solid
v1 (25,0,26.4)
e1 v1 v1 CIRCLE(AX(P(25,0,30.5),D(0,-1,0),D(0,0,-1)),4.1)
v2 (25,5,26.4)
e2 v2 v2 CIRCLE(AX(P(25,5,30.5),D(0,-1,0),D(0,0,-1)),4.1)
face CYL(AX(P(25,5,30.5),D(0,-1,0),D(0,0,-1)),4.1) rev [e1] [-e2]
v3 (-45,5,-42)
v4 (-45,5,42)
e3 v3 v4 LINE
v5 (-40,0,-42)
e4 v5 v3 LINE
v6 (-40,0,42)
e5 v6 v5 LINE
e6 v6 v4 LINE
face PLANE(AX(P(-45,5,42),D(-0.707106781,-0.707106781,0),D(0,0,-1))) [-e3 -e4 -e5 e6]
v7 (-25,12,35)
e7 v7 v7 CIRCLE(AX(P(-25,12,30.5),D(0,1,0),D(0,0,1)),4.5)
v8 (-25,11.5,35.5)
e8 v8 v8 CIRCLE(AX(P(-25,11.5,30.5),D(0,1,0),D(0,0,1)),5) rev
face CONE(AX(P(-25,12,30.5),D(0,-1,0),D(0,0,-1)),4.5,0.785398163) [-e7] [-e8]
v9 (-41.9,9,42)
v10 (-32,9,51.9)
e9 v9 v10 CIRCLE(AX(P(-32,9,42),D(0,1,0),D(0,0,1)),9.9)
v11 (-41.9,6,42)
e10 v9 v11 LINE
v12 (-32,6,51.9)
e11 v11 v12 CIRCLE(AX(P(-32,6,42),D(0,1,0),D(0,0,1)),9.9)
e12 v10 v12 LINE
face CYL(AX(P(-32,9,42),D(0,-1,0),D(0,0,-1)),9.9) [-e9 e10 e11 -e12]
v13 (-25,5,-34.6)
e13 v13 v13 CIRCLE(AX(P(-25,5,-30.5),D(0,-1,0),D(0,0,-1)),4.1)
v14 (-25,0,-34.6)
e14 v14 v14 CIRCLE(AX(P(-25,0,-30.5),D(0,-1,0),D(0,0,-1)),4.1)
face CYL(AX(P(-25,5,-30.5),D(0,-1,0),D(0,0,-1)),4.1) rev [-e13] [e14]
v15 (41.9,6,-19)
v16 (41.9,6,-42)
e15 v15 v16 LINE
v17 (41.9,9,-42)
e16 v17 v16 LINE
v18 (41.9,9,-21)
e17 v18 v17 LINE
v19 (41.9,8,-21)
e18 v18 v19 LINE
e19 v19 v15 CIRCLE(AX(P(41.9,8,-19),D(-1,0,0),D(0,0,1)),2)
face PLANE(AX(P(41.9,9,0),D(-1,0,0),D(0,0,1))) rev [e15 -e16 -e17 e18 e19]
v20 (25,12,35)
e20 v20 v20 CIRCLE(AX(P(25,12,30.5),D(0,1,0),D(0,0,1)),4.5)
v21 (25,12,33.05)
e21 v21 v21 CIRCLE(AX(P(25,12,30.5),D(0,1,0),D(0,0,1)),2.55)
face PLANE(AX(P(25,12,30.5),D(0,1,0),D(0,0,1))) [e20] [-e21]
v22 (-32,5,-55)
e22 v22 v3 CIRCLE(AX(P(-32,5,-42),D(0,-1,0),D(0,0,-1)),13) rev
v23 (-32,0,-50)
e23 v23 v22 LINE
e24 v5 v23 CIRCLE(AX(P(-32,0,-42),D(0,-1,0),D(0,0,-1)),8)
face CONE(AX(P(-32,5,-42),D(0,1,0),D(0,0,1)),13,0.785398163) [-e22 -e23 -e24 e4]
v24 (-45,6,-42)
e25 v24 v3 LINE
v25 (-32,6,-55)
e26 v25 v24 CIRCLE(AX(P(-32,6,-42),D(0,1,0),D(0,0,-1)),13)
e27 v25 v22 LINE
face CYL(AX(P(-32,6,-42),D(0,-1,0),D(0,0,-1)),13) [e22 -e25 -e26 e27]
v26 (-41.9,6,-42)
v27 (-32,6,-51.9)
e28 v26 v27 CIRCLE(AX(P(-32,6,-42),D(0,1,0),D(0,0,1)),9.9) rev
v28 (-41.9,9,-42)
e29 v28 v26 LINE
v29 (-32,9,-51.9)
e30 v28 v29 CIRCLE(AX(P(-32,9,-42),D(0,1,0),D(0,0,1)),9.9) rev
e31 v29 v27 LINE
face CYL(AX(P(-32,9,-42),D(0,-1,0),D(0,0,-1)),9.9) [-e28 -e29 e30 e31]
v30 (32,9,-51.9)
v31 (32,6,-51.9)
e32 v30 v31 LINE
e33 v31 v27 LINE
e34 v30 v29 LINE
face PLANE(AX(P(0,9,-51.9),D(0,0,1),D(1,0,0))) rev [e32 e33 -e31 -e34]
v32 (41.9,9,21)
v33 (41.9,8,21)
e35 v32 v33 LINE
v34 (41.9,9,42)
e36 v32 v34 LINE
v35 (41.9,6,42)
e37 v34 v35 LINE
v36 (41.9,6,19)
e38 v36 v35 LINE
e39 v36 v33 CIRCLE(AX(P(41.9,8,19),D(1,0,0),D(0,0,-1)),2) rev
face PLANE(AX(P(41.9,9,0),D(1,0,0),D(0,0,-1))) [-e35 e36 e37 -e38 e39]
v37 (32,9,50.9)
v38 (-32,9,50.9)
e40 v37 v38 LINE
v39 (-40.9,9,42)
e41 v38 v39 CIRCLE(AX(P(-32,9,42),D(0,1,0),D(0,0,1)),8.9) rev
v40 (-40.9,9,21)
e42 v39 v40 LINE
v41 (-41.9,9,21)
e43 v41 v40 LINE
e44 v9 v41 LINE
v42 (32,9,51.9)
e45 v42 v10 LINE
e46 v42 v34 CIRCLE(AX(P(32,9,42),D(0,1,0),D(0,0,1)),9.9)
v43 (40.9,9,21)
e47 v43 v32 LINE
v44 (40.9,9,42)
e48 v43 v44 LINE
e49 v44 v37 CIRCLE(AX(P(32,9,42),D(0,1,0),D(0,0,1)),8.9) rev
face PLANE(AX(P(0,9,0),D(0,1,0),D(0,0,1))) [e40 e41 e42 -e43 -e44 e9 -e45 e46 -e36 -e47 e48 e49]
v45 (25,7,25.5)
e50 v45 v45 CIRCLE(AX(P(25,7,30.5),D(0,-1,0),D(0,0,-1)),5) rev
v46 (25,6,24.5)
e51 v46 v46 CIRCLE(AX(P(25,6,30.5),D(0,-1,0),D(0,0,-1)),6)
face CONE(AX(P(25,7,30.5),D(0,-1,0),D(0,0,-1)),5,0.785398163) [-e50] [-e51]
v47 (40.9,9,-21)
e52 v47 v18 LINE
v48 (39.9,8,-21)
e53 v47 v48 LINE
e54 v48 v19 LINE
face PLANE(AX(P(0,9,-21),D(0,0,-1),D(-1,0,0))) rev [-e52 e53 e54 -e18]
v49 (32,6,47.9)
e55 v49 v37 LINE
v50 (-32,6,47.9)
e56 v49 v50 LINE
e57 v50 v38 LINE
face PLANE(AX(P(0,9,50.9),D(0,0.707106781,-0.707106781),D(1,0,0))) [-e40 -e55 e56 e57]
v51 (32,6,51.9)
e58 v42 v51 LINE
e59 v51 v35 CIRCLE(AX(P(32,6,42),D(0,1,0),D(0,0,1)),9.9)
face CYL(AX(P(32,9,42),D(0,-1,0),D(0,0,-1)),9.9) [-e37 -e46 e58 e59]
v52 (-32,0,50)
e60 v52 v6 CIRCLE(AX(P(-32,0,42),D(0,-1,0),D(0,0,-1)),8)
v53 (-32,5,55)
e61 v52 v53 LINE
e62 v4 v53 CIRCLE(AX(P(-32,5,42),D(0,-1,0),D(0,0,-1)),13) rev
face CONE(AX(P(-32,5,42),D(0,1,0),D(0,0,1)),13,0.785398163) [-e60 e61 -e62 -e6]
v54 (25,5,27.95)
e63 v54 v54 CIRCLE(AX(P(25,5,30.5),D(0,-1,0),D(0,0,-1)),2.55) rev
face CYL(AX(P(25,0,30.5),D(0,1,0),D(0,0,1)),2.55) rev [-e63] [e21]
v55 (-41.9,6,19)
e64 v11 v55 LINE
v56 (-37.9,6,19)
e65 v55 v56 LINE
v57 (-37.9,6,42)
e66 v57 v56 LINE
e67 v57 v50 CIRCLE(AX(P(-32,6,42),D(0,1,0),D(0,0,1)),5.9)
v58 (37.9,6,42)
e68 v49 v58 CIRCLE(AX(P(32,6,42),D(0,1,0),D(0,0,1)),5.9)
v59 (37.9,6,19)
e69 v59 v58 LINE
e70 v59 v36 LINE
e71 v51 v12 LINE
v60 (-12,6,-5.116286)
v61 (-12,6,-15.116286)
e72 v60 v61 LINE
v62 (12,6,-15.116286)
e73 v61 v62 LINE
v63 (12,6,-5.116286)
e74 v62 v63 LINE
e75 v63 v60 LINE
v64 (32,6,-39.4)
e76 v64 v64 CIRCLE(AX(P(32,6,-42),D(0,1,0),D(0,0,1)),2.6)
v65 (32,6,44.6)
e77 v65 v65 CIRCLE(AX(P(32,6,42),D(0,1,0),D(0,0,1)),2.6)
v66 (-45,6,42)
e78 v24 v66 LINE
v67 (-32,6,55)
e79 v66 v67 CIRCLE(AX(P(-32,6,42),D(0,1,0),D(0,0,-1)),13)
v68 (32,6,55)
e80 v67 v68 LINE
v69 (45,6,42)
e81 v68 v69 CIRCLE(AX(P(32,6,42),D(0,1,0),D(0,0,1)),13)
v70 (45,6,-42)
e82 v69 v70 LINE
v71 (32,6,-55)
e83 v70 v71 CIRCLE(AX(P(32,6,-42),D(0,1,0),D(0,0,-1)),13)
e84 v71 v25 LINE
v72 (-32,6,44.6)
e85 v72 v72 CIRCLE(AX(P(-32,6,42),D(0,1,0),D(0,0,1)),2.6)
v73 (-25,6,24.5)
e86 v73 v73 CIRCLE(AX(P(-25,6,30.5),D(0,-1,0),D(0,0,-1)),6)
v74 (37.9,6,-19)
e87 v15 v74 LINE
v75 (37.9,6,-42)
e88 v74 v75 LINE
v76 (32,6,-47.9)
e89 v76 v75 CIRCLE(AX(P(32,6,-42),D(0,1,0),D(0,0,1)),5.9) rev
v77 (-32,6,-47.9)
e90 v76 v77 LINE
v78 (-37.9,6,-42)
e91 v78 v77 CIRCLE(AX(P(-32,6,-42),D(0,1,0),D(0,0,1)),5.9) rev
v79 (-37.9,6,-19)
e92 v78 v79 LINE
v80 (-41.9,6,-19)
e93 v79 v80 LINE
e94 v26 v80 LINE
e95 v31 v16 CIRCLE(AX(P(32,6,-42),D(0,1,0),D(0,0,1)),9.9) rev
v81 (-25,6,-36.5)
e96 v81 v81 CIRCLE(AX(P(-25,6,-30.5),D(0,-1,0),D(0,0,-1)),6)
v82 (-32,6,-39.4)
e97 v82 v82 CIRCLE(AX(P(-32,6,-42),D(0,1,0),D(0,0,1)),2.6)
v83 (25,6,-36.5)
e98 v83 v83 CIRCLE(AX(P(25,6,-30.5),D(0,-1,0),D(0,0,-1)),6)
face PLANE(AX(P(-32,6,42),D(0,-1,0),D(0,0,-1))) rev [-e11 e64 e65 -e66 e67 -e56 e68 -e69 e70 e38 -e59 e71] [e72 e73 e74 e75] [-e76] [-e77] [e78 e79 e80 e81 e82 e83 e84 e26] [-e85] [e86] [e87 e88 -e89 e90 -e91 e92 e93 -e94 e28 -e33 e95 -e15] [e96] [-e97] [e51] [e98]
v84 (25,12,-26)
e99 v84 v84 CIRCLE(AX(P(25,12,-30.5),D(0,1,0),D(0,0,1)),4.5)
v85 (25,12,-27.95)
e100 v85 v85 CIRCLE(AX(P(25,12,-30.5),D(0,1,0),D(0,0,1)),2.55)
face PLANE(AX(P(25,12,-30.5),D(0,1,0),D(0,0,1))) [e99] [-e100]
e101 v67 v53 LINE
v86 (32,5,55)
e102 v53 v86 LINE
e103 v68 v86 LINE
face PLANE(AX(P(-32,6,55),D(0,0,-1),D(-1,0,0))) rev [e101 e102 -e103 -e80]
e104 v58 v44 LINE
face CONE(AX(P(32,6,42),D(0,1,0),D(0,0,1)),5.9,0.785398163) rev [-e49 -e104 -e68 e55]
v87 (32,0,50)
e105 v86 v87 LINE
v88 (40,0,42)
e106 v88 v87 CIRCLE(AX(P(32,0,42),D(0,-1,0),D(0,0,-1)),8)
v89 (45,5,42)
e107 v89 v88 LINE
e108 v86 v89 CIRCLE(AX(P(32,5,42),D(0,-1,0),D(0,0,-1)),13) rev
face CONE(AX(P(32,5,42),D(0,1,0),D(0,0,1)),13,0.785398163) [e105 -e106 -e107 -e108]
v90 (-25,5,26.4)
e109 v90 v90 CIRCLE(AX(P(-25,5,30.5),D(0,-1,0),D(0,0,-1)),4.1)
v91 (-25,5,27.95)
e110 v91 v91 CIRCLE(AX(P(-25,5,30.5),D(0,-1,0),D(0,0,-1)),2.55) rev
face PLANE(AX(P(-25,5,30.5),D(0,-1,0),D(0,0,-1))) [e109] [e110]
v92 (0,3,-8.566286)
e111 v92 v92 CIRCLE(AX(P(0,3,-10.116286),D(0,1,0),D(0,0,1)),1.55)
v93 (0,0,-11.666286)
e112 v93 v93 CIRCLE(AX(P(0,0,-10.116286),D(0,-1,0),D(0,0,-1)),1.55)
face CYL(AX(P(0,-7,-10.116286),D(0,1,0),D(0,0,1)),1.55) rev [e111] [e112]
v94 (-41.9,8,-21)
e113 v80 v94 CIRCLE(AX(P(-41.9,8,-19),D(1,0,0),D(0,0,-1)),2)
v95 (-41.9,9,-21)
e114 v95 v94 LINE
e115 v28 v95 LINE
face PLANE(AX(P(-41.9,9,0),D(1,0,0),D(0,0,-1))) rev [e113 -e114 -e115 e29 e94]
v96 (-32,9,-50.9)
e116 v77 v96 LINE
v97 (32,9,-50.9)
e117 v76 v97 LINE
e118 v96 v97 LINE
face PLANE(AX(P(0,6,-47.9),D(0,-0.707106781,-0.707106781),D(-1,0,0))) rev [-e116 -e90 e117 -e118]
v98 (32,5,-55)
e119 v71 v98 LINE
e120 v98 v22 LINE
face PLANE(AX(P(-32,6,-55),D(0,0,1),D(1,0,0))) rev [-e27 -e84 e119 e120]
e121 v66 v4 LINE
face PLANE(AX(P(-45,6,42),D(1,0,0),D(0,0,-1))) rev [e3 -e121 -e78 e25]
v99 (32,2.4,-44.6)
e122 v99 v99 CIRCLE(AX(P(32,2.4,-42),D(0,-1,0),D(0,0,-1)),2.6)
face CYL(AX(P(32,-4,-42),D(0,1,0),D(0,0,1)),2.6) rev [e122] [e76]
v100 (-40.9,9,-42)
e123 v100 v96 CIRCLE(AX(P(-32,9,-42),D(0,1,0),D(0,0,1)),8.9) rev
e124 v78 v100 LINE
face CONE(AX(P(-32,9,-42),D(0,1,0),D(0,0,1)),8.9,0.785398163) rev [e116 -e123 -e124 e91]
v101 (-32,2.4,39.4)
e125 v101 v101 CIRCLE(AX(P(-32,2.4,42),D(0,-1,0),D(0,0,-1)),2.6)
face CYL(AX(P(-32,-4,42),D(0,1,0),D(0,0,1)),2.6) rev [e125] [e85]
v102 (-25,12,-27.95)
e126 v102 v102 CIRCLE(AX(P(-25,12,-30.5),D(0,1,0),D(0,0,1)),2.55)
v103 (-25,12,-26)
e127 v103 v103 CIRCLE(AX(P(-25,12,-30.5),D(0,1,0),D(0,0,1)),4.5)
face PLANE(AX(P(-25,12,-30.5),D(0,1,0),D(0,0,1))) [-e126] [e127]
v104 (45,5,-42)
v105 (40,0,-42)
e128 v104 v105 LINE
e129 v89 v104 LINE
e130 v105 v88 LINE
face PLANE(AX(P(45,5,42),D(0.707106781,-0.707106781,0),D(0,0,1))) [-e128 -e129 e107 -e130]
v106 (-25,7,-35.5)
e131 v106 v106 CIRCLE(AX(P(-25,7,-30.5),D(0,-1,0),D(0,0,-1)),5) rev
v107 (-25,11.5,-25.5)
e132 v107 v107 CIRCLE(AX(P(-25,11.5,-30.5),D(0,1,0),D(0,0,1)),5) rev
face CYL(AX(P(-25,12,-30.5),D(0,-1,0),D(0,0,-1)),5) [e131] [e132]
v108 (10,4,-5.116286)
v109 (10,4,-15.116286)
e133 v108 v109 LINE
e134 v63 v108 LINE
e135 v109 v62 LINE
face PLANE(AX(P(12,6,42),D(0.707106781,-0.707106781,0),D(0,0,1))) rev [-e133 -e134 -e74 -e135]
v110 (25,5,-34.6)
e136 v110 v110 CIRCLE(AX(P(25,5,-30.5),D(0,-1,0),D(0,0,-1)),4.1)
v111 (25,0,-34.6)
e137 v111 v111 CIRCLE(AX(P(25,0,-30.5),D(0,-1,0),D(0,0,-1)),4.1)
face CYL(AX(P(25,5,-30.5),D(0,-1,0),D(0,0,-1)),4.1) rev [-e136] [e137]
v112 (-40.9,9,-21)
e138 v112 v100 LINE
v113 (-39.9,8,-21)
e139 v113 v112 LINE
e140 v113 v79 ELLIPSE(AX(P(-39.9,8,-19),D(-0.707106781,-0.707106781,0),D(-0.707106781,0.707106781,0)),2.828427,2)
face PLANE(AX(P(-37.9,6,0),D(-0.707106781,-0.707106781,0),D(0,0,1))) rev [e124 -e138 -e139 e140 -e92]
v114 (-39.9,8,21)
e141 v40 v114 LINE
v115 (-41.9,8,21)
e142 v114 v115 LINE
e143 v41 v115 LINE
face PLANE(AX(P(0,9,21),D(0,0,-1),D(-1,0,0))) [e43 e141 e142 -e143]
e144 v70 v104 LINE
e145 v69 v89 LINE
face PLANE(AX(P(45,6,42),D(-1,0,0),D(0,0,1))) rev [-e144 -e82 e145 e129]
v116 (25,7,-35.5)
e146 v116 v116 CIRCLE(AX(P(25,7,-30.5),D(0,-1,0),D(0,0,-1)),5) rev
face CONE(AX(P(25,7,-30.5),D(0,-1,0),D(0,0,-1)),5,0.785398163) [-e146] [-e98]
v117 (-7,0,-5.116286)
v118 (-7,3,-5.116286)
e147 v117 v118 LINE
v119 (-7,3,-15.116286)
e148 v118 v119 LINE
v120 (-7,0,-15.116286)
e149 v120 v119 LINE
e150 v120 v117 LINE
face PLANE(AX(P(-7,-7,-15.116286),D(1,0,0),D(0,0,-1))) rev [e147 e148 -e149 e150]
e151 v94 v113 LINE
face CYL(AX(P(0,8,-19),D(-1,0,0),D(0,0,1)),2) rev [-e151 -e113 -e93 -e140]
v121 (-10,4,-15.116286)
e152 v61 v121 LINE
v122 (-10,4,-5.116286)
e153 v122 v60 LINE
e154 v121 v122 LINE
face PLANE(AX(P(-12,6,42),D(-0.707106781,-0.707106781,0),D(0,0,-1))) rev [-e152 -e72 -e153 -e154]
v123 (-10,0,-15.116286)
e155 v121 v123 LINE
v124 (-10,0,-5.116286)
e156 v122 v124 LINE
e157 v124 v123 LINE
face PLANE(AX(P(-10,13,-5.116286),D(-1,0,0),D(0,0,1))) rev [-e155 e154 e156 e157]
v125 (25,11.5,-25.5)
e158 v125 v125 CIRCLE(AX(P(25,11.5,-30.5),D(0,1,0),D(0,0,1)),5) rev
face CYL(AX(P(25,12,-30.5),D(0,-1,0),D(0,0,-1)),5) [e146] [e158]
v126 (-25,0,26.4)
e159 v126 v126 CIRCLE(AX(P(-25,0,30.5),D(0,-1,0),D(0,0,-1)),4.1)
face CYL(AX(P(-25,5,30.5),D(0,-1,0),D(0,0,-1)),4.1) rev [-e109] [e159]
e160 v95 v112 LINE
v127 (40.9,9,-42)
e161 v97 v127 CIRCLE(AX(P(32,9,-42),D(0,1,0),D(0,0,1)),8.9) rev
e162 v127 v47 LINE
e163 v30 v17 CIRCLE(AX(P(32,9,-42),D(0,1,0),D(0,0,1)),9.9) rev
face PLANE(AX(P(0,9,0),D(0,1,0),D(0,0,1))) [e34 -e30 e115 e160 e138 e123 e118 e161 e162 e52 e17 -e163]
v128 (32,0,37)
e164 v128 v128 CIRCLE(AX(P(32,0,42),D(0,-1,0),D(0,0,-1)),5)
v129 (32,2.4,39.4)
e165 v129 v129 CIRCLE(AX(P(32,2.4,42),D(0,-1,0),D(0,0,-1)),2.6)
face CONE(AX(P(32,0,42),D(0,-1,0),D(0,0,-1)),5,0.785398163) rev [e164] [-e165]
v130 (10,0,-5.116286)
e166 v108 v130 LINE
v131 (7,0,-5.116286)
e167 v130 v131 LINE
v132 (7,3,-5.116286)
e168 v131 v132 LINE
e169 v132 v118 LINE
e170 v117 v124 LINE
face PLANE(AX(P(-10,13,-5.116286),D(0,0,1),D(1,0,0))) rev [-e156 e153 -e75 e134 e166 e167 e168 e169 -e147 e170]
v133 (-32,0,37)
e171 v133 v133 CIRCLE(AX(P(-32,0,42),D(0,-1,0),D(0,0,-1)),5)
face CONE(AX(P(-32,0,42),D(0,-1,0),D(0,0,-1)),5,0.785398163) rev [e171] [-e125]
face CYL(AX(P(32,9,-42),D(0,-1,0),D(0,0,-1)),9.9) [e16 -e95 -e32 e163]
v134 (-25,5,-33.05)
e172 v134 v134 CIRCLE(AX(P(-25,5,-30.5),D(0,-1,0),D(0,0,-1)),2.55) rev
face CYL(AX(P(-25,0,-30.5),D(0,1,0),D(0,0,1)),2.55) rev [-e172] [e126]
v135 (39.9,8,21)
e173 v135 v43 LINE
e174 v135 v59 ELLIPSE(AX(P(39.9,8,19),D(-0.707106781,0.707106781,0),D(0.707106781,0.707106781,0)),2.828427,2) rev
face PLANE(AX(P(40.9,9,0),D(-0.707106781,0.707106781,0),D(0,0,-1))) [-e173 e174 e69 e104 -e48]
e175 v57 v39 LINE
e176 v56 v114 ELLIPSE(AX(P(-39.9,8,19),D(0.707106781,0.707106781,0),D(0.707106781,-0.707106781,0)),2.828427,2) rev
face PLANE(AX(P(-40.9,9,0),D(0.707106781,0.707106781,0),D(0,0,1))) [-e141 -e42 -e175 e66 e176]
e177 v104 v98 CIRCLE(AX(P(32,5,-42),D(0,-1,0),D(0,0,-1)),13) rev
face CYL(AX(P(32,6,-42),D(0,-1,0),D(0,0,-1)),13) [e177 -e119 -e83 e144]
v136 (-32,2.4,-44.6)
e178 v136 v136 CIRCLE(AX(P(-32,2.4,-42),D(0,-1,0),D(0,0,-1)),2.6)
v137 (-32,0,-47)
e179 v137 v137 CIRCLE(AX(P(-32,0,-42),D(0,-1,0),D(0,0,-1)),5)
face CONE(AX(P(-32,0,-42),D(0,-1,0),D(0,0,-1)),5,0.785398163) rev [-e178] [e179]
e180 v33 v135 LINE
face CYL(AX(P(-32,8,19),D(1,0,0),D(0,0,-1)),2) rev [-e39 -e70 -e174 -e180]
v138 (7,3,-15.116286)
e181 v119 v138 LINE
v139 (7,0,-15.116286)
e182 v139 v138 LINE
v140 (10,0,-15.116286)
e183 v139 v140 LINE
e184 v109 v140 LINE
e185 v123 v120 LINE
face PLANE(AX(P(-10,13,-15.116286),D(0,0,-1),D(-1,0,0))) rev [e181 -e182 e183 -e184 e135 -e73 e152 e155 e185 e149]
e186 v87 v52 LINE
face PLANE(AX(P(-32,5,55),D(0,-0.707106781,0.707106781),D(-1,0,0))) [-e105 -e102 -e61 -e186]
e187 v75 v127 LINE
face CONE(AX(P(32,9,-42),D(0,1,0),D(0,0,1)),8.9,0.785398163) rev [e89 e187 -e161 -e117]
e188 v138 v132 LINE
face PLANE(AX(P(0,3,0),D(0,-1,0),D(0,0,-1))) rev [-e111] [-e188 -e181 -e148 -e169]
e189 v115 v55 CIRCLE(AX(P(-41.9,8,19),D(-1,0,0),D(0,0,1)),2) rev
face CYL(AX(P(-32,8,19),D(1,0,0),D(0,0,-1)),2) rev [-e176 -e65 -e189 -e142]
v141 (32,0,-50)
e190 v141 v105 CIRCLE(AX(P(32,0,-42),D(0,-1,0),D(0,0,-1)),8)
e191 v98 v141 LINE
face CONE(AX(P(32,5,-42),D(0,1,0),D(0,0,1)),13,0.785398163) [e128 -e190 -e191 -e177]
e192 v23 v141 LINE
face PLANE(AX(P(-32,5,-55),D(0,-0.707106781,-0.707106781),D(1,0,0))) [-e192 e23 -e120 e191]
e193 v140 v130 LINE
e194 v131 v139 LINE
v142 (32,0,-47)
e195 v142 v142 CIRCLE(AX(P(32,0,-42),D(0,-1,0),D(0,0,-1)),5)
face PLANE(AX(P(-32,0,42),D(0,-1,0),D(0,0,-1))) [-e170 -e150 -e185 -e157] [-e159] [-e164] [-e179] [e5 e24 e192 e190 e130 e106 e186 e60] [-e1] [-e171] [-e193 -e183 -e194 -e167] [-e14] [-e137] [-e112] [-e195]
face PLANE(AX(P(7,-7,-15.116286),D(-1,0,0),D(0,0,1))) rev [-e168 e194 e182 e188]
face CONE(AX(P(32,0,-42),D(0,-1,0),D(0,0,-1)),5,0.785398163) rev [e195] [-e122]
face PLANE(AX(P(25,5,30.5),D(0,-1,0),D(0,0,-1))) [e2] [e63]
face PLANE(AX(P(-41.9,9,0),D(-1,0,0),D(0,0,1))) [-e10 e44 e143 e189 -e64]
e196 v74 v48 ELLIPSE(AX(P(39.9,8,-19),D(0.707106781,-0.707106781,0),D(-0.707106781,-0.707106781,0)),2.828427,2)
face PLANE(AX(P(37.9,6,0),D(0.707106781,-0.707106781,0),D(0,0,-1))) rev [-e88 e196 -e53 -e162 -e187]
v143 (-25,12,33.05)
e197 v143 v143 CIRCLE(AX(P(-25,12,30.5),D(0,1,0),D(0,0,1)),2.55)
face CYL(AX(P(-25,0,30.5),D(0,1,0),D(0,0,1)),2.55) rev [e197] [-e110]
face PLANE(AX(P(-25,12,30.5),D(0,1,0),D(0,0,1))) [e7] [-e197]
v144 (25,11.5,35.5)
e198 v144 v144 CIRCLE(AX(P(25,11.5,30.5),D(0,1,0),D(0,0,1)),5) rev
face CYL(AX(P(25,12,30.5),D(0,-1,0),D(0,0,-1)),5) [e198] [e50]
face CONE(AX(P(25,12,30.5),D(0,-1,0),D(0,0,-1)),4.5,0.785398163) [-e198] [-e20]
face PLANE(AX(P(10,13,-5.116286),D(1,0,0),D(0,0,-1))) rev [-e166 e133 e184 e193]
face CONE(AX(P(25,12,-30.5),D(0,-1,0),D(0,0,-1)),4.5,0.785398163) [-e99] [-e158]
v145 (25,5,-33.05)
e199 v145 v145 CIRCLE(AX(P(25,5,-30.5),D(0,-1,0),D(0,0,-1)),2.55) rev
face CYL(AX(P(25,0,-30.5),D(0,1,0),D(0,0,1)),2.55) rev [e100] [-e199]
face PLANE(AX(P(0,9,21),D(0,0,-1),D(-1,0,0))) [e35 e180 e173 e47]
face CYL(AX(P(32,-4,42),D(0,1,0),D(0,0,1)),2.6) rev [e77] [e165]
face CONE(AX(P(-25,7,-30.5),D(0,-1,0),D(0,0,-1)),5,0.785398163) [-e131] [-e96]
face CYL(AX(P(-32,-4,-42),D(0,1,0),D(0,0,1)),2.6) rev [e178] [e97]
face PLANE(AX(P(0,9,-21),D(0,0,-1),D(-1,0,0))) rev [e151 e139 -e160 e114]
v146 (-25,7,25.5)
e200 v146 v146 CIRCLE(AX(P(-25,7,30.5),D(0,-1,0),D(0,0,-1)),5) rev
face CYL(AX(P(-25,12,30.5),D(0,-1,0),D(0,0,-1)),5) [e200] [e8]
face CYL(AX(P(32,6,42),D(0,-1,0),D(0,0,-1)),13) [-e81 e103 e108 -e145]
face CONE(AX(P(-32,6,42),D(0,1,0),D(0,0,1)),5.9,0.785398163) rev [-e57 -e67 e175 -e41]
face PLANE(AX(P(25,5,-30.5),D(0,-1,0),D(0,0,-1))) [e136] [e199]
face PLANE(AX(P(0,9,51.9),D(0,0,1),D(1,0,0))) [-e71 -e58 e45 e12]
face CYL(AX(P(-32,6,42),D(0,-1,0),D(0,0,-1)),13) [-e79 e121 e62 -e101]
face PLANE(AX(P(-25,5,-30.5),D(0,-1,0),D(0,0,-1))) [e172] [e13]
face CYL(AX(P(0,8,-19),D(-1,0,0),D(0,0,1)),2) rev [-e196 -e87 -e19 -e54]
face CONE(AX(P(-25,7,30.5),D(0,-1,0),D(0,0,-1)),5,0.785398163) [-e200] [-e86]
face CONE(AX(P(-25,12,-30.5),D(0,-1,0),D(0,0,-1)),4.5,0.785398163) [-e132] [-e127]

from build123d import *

# Parameters (mm, degrees)
BOSS_EXTRUDE1_DEPTH          = 6
CHAMFER1_SIZE                = 5
BOSS_EXTRUDE2_DEPTH          = 3
CHAMFER2_SIZE                = 3
SKETCH3_R                    = 2.55
CUT_EXTRUDE1_DEPTH           = 72.316197319
BOSS_EXTRUDE3_START          = 6
SKETCH4_R                    = 5
SKETCH4_R_2                  = 2.55
BOSS_EXTRUDE3_DEPTH          = 6
CHAMFER3_SIZE                = 1
CHAMFER4_SIZE                = 0.5
SKETCH5_R                    = 4.1
CUT_EXTRUDE2_DEPTH           = 5
SKETCH6_R                    = 2.6
CUT_EXTRUDE3_DEPTH           = 10
SKETCH7_R                    = 5
CUT_EXTRUDE4_DEPTH           = 2.8
CUT_EXTRUDE4_DRAFT           = -45
CUT_EXTRUDE4_PROFILE_2_DEPTH = 2.8
CUT_EXTRUDE4_PROFILE_2_DRAFT = -45
CUT_EXTRUDE4_PROFILE_3_DEPTH = 2.8
CUT_EXTRUDE4_PROFILE_3_DRAFT = -45
CUT_EXTRUDE4_PROFILE_4_DEPTH = 2.8
CUT_EXTRUDE4_PROFILE_4_DRAFT = -45
FILLET1_R                    = 2
CUT_EXTRUDE5_START           = -3
SKETCH8_W                    = 20
SKETCH8_H                    = 10
CUT_EXTRUDE5_DEPTH           = 10
CHAMFER5_SIZE                = 2
SKETCH9_R                    = 1.55
SKETCH9_W                    = 3
SKETCH9_H                    = 10
CUT_EXTRUDE6_DEPTH           = 10


with BuildPart() as part:
    # Sketch1 → Boss-Extrude1 (new body)
    with BuildSketch(Plane(origin=(0, 0, 0), x_dir=(1, 0, 0), z_dir=(0, 1, 0))):
        with BuildLine():
            Line((-32, -55), (32, -55))
            ThreePointArc((32, -55), (41.192388155, -51.192388155), (45, -42))
            Line((45, -42), (45, 42))
            ThreePointArc((45, 42), (41.192388155, 51.192388155), (32, 55))
            Line((32, 55), (-32, 55))
            ThreePointArc((-32, 55), (-41.192388155, 51.192388155), (-45, 42))
            Line((-45, 42), (-45, -42))
            ThreePointArc((-45, -42), (-41.192388155, -51.192388155), (-32, -55))
        make_face()
    extrude(amount=BOSS_EXTRUDE1_DEPTH)

    # Chamfer1
    chamfer1_edges = [part.edges().sort_by_distance(p)[0] for p in [
        (45, 0, 0),
        (41.192388155, 0, 51.192388155),
        (0, 0, 55),
        (-41.192388155, 0, 51.192388155),
        (-45, 0, 0),
        (-41.192388155, 0, -51.192388155),
        (0, 0, -55),
        (41.192388155, 0, -51.192388155),
    ]]
    chamfer(chamfer1_edges, length=CHAMFER1_SIZE)

    # Sketch2 → Boss-Extrude2 (add)
    with BuildSketch(Plane(origin=(0, 6, 0), x_dir=(1, 0, 0), z_dir=(0, 1, 0))):
        with BuildLine():
            ThreePointArc((-37.9, -42), (-36.171930009, -46.171930009), (-32, -47.9))
            Line((-32, -47.9), (32, -47.9))
            ThreePointArc((32, -47.9), (36.171930009, -46.171930009), (37.9, -42))
            Line((37.9, -42), (37.9, -21))
            Line((37.9, -21), (41.9, -21))
            Line((41.9, -21), (41.9, -42))
            ThreePointArc((41.9, -42), (39.000357134, -49.000357134), (32, -51.9))
            Line((32, -51.9), (-32, -51.9))
            ThreePointArc((-32, -51.9), (-39.000357134, -49.000357134), (-41.9, -42))
            Line((-41.9, -42), (-41.9, -21))
            Line((-41.9, -21), (-37.9, -21))
            Line((-37.9, -21), (-37.9, -42))
        make_face()
        with BuildLine():
            ThreePointArc((-41.9, 42), (-39.000357134, 49.000357134), (-32, 51.9))
            Line((-32, 51.9), (32, 51.9))
            ThreePointArc((32, 51.9), (39.000357134, 49.000357134), (41.9, 42))
            Line((41.9, 42), (41.9, 21))
            Line((41.9, 21), (37.9, 21))
            Line((37.9, 21), (37.9, 42))
            ThreePointArc((37.9, 42), (36.171930009, 46.171930009), (32, 47.9))
            Line((32, 47.9), (-32, 47.9))
            ThreePointArc((-32, 47.9), (-36.171930009, 46.171930009), (-37.9, 42))
            Line((-37.9, 42), (-37.9, 21))
            Line((-37.9, 21), (-41.9, 21))
            Line((-41.9, 21), (-41.9, 42))
        make_face()
    extrude(amount=BOSS_EXTRUDE2_DEPTH)

    # Chamfer2
    chamfer2_edges = [part.edges().sort_by_distance(p)[0] for p in [
        (37.9, 9, 31.5),
        (36.171930009, 9, 46.171930009),
        (0, 9, 47.9),
        (-36.171930009, 9, 46.171930009),
        (-37.9, 9, 31.5),
        (-37.9, 9, -31.5),
        (-36.171930009, 9, -46.171930009),
        (0, 9, -47.9),
        (36.171930009, 9, -46.171930009),
        (37.9, 9, -31.5),
    ]]
    chamfer(chamfer2_edges, length=CHAMFER2_SIZE - 0.0001)  # a hair under: the kernel refuses the full size

    # Sketch3 → Cut-Extrude1 (cut, through all)
    with BuildSketch(Plane(origin=(0, 6, 0), x_dir=(1, 0, 0), z_dir=(0, 1, 0))):
        with Locations(Location((-25, 30.5, 0), (0, 0, 270))):
            Circle(SKETCH3_R)
        with Locations(Location((25, 30.5, 0), (0, 0, 90))):
            Circle(SKETCH3_R)
        with Locations(Location((25, -30.5, 0), (0, 0, 270))):
            Circle(SKETCH3_R)
        with Locations(Location((-25, -30.5, 0), (0, 0, 90))):
            Circle(SKETCH3_R)
    extrude(amount=-CUT_EXTRUDE1_DEPTH, mode=Mode.SUBTRACT)

    # Sketch4 → Boss-Extrude3 (add)
    # profile 1 of 4: a face of its own
    with BuildSketch(Plane(origin=(0, 6, 0), x_dir=(1, 0, 0), z_dir=(0, 1, 0)).offset(BOSS_EXTRUDE3_START)):
        with Locations(Location((-25, -30.5, 0), (0, 0, 90))):
            Circle(SKETCH4_R)
        with Locations(Location((-25, -30.5, 0), (0, 0, 270))):
            Circle(SKETCH4_R_2, mode=Mode.SUBTRACT)
    # profile 2 of 4: a face of its own
    with BuildSketch(Plane(origin=(0, 6, 0), x_dir=(1, 0, 0), z_dir=(0, 1, 0)).offset(BOSS_EXTRUDE3_START)):
        with Locations(Location((25, -30.5, 0), (0, 0, 90))):
            Circle(SKETCH4_R)
        with Locations(Location((25, -30.5, 0), (0, 0, 270))):
            Circle(SKETCH4_R_2, mode=Mode.SUBTRACT)
    # profile 3 of 4: a face of its own
    with BuildSketch(Plane(origin=(0, 6, 0), x_dir=(1, 0, 0), z_dir=(0, 1, 0)).offset(BOSS_EXTRUDE3_START)):
        with Locations(Location((-25, 30.5, 0), (0, 0, 90))):
            Circle(SKETCH4_R)
        with Locations(Location((-25, 30.5, 0), (0, 0, 270))):
            Circle(SKETCH4_R_2, mode=Mode.SUBTRACT)
    # profile 4 of 4: a face of its own
    with BuildSketch(Plane(origin=(0, 6, 0), x_dir=(1, 0, 0), z_dir=(0, 1, 0)).offset(BOSS_EXTRUDE3_START)):
        with Locations(Location((25, 30.5, 0), (0, 0, 90))):
            Circle(SKETCH4_R)
        with Locations(Location((25, 30.5, 0), (0, 0, 270))):
            Circle(SKETCH4_R_2, mode=Mode.SUBTRACT)
    extrude(amount=-BOSS_EXTRUDE3_DEPTH)

    # Chamfer3
    chamfer3_edges = [part.edges().sort_by_distance(p)[0] for p in [
        (-25, 6, 35.5),
        (25, 6, 35.5),
        (-25, 6, -25.5),
        (25, 6, -25.5),
    ]]
    chamfer(chamfer3_edges, length=CHAMFER3_SIZE)

    # Chamfer4
    chamfer4_edges = [part.edges().sort_by_distance(p)[0] for p in [
        (-25, 12, 35.5),
        (25, 12, 35.5),
        (-25, 12, -25.5),
        (25, 12, -25.5),
    ]]
    chamfer(chamfer4_edges, length=CHAMFER4_SIZE)

    # Sketch5 → Cut-Extrude2 (cut)
    with BuildSketch(Plane.XZ):
        with Locations(Location((-25, 30.5, 0), (0, 0, 270))):
            Circle(SKETCH5_R)
        with Locations(Location((25, 30.5, 0), (0, 0, 270))):
            Circle(SKETCH5_R)
        with Locations(Location((-25, -30.5, 0), (0, 0, 270))):
            Circle(SKETCH5_R)
        with Locations(Location((25, -30.5, 0), (0, 0, 270))):
            Circle(SKETCH5_R)
    extrude(amount=-CUT_EXTRUDE2_DEPTH, mode=Mode.SUBTRACT)

    # Sketch6 → Cut-Extrude3 (cut)
    with BuildSketch(Plane(origin=(0, 6, 0), x_dir=(1, 0, 0), z_dir=(0, 1, 0))):
        with Locations(Location((-32, 42, 0), (0, 0, 270))):
            Circle(SKETCH6_R)
        with Locations(Location((32, 42, 0), (0, 0, 270))):
            Circle(SKETCH6_R)
        with Locations(Location((32, -42, 0), (0, 0, 270))):
            Circle(SKETCH6_R)
        with Locations(Location((-32, -42, 0), (0, 0, 270))):
            Circle(SKETCH6_R)
    extrude(amount=-CUT_EXTRUDE3_DEPTH, mode=Mode.SUBTRACT)


with BuildPart() as cut_extrude4_tool:
    # Sketch7 → Cut-Extrude4 (with draft: the straight prism first)
    with BuildSketch(Plane.XZ):
        with Locations((32, 42)):
            Circle(SKETCH7_R)
    extrude(amount=-CUT_EXTRUDE4_DEPTH)
    # Cut-Extrude4: the draft: its side faces are tilted about the plane it starts from
    cut_extrude4_sides = [cut_extrude4_tool.faces().sort_by_distance(p)[0] for p in [
        (27, 1.4, 42),
    ]]
    draft(cut_extrude4_sides, Plane.XZ, CUT_EXTRUDE4_DRAFT)


with BuildPart() as part_1:
    add(part.part)

    # Cut-Extrude4: cut by cut_extrude4_tool
    add(cut_extrude4_tool.part, mode=Mode.SUBTRACT)


with BuildPart() as cut_extrude4_profile_2_tool:
    # Sketch7 → Cut-Extrude4 profile 2 (with draft: the straight prism first)
    with BuildSketch(Plane.XZ):
        with Locations((-32, 42)):
            Circle(SKETCH7_R)
    extrude(amount=-CUT_EXTRUDE4_PROFILE_2_DEPTH)
    # Cut-Extrude4 profile 2: the draft: its side faces are tilted about the plane it starts from
    cut_extrude4_profile_2_sides = [cut_extrude4_profile_2_tool.faces().sort_by_distance(p)[0] for p in [
        (-37, 1.4, 42),
    ]]
    draft(cut_extrude4_profile_2_sides, Plane.XZ, CUT_EXTRUDE4_PROFILE_2_DRAFT)


with BuildPart() as part_2:
    add(part_1.part)

    # Cut-Extrude4 profile 2: cut by cut_extrude4_profile_2_tool
    add(cut_extrude4_profile_2_tool.part, mode=Mode.SUBTRACT)


with BuildPart() as cut_extrude4_profile_3_tool:
    # Sketch7 → Cut-Extrude4 profile 3 (with draft: the straight prism first)
    with BuildSketch(Plane.XZ):
        with Locations((-32, -42)):
            Circle(SKETCH7_R)
    extrude(amount=-CUT_EXTRUDE4_PROFILE_3_DEPTH)
    # Cut-Extrude4 profile 3: the draft: its side faces are tilted about the plane it starts from
    cut_extrude4_profile_3_sides = [cut_extrude4_profile_3_tool.faces().sort_by_distance(p)[0] for p in [
        (-37, 1.4, -42),
    ]]
    draft(cut_extrude4_profile_3_sides, Plane.XZ, CUT_EXTRUDE4_PROFILE_3_DRAFT)


with BuildPart() as part_3:
    add(part_2.part)

    # Cut-Extrude4 profile 3: cut by cut_extrude4_profile_3_tool
    add(cut_extrude4_profile_3_tool.part, mode=Mode.SUBTRACT)


with BuildPart() as cut_extrude4_profile_4_tool:
    # Sketch7 → Cut-Extrude4 profile 4 (with draft: the straight prism first)
    with BuildSketch(Plane.XZ):
        with Locations((32, -42)):
            Circle(SKETCH7_R)
    extrude(amount=-CUT_EXTRUDE4_PROFILE_4_DEPTH)
    # Cut-Extrude4 profile 4: the draft: its side faces are tilted about the plane it starts from
    cut_extrude4_profile_4_sides = [cut_extrude4_profile_4_tool.faces().sort_by_distance(p)[0] for p in [
        (27, 1.4, -42),
    ]]
    draft(cut_extrude4_profile_4_sides, Plane.XZ, CUT_EXTRUDE4_PROFILE_4_DRAFT)


with BuildPart() as part_4:
    add(part_3.part)

    # Cut-Extrude4 profile 4: cut by cut_extrude4_profile_4_tool
    add(cut_extrude4_profile_4_tool.part, mode=Mode.SUBTRACT)

    # Fillet1
    fillet1_edges = [part_4.edges().sort_by_distance(p)[0] for p in [
        (39.9, 6, 21),
        (-39.9, 6, 21),
        (-39.9, 6, -21),
        (39.9, 6, -21),
    ]]
    fillet(fillet1_edges, radius=FILLET1_R)

    # Sketch8 → Cut-Extrude5 (cut)
    with BuildSketch(Plane.XZ.offset(CUT_EXTRUDE5_START)):
        with Locations((0, -10.11628608)):
            Rectangle(SKETCH8_W, SKETCH8_H)
    extrude(amount=-CUT_EXTRUDE5_DEPTH, mode=Mode.SUBTRACT)

    # Chamfer5
    chamfer5_edges = [part_4.edges().sort_by_distance(p)[0] for p in [
        (-10, 6, -10.11628608),
        (10, 6, -10.11628608),
    ]]
    chamfer(chamfer5_edges, length=CHAMFER5_SIZE)

    # Sketch9 → Cut-Extrude6 (cut)
    with BuildSketch(Plane(origin=(0, 3, 0), x_dir=(1, 0, 0), z_dir=(0, 1, 0))):
        with Locations(Location((0, 10.11628608, 0), (0, 0, 270))):
            Circle(SKETCH9_R)
        with Locations((-8.5, 10.11628608)):
            Rectangle(SKETCH9_W, SKETCH9_H)
        with Locations((8.5, 10.11628608)):
            Rectangle(SKETCH9_W, SKETCH9_H)
    extrude(amount=-CUT_EXTRUDE6_DEPTH, mode=Mode.SUBTRACT)


solid = part_4.part
